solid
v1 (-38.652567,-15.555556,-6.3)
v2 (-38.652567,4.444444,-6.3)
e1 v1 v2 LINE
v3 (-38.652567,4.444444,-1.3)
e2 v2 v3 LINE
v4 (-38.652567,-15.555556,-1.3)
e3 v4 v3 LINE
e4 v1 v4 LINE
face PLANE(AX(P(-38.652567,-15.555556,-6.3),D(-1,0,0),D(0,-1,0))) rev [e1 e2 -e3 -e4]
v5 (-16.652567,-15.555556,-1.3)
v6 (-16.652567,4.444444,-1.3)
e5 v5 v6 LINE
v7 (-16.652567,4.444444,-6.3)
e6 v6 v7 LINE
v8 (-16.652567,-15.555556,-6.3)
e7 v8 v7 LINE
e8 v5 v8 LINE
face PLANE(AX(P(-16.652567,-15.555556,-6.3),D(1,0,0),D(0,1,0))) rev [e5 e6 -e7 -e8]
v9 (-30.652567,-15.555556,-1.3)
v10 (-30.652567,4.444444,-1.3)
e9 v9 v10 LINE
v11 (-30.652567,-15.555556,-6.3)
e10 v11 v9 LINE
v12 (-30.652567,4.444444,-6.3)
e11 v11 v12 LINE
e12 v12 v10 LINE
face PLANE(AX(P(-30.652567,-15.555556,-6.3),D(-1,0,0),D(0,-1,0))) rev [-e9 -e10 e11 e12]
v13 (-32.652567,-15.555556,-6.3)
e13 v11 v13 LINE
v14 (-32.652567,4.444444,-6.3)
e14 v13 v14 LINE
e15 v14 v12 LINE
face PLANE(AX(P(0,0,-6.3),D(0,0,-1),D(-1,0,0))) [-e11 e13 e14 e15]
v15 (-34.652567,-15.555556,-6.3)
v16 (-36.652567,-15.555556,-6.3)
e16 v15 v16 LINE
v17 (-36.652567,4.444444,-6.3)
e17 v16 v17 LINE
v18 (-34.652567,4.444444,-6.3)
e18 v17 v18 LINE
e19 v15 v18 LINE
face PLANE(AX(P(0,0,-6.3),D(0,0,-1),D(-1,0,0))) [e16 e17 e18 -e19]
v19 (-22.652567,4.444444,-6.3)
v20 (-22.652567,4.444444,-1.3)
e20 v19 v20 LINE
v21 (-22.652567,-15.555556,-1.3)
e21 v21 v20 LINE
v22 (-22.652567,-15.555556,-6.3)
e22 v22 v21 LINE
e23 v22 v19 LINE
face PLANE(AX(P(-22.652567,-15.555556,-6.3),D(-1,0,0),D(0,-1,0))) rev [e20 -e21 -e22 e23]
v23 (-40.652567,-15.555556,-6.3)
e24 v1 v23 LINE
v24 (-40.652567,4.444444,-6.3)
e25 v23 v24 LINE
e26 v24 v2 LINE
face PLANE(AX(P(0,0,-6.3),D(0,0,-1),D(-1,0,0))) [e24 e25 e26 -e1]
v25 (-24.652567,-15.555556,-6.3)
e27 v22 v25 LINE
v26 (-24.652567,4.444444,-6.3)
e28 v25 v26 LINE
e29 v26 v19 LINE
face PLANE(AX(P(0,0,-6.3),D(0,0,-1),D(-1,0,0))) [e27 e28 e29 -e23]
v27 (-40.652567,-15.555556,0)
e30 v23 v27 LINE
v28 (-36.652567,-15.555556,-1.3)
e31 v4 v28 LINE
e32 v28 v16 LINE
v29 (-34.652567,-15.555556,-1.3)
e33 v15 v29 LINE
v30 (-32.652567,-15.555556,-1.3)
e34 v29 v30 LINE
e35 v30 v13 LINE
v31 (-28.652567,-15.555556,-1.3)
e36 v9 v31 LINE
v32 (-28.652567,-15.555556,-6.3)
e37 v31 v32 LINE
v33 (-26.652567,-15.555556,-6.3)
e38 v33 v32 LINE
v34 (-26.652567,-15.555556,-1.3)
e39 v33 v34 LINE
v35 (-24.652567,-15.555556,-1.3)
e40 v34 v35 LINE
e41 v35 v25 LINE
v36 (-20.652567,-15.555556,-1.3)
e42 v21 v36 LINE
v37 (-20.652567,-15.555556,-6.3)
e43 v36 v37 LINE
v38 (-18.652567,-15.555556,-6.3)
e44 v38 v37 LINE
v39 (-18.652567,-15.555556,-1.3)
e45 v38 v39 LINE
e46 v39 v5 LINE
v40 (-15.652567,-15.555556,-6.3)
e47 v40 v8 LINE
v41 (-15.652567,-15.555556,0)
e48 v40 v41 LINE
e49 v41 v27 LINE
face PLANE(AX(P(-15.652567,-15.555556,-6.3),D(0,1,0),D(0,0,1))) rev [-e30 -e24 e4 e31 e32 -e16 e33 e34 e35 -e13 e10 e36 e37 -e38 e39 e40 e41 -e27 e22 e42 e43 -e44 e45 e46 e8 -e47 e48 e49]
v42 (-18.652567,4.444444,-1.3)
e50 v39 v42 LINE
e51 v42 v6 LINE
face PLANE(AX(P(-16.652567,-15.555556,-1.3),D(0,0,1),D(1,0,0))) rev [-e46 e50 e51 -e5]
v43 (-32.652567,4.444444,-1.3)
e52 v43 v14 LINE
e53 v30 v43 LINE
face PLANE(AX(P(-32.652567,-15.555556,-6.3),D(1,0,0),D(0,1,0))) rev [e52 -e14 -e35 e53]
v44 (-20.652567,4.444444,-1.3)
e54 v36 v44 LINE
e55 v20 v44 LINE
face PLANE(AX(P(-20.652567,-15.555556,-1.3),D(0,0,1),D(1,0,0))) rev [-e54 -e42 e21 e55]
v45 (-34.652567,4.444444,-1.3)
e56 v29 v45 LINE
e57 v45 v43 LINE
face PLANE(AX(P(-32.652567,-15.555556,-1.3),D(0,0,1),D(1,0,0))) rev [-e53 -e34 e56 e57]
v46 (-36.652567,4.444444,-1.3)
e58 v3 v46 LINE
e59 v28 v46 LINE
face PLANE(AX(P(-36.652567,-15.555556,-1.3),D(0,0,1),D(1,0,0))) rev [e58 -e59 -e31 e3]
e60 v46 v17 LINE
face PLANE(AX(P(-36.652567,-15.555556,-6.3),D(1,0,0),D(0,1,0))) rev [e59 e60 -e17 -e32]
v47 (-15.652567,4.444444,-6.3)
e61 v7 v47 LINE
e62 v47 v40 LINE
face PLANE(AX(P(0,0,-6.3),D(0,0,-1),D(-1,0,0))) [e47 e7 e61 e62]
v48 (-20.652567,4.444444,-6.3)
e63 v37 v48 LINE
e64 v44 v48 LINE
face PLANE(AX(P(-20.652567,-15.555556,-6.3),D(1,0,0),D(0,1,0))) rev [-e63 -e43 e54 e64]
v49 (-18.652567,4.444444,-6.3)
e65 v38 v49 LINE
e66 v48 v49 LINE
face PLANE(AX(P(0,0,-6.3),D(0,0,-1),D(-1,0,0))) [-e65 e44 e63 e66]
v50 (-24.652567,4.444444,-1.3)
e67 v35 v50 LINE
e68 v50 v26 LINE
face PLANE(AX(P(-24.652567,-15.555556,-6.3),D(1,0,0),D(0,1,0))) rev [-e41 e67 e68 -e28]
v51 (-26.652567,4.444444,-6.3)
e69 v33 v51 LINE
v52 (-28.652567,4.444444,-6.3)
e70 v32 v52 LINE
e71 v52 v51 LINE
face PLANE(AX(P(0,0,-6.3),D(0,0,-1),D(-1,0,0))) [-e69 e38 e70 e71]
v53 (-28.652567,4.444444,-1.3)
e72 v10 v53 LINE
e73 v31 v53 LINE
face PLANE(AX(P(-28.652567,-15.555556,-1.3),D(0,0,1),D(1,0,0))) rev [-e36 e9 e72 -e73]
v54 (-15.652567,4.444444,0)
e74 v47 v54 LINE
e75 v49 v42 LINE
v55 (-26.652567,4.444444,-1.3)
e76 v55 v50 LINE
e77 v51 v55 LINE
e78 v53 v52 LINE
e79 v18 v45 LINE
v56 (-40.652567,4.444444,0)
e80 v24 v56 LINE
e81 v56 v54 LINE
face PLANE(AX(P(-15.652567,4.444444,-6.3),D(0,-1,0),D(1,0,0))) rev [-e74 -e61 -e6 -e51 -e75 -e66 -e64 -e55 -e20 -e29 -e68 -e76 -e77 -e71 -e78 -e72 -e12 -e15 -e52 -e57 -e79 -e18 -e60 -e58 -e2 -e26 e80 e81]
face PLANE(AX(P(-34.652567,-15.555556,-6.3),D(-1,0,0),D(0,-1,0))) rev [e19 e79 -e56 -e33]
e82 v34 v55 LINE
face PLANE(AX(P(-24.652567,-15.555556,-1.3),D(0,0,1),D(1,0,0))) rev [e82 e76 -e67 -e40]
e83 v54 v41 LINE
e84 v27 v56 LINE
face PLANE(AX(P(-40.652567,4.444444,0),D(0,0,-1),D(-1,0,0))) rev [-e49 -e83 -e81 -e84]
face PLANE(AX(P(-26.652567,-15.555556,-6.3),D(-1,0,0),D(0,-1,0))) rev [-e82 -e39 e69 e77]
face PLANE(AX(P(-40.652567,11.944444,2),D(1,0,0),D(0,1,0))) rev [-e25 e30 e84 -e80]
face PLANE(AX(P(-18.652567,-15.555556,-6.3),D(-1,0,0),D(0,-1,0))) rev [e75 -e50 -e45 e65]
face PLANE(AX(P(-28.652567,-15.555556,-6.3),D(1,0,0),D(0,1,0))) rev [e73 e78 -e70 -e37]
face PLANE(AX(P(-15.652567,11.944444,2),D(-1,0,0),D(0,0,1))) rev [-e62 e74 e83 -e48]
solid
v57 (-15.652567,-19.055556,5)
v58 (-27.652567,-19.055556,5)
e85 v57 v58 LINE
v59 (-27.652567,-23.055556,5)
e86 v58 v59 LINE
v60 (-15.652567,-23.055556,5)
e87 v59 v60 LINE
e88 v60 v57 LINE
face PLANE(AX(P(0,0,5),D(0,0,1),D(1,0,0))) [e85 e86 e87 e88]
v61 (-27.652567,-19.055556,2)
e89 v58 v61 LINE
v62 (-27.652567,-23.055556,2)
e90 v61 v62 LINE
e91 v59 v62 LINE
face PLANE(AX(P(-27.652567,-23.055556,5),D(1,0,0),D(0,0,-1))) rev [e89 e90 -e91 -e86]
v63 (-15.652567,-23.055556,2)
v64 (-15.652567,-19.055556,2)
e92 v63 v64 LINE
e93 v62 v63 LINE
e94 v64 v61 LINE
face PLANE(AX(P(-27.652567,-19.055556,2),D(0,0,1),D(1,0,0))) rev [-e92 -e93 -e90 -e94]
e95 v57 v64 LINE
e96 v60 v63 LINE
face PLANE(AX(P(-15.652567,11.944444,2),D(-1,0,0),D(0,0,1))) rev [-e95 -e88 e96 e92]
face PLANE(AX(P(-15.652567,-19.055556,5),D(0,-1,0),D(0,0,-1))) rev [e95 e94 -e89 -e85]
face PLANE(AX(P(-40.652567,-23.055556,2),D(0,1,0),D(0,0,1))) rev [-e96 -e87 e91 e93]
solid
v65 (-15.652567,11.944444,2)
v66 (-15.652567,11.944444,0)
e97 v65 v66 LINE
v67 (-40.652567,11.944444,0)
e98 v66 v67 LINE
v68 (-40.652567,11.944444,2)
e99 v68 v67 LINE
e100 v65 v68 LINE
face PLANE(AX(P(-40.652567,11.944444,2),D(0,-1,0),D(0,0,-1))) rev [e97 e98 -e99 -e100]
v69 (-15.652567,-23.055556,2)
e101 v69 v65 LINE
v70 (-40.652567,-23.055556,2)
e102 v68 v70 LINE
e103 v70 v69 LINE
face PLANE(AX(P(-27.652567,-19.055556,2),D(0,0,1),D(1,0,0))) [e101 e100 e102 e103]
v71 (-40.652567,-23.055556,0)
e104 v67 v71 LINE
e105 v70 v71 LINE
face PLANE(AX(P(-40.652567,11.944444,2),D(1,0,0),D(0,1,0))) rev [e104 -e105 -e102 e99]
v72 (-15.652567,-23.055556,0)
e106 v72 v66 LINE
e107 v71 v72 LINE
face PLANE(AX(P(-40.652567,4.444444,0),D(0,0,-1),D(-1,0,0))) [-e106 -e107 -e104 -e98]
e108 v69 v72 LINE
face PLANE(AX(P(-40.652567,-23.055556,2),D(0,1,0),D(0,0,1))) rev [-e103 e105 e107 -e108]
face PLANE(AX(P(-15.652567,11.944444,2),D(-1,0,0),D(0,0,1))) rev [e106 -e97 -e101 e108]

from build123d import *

# Parameters (mm, degrees)
CROQUIS1_W              = 25
CROQUIS1_H              = 35
SALIENTE_EXTRUIR1_DEPTH = 2
CROQUIS2_W              = 12
CROQUIS2_H              = 4
SALIENTE_EXTRUIR2_DEPTH = 3
CROQUIS4_W              = 25
CROQUIS4_H              = 20
SALIENTE_EXTRUIR3_DEPTH = 6.3
CROQUIS5_W              = 2
CROQUIS5_H              = 5
CORTAR_EXTRUIR1_DEPTH   = 20


# Read off the part's stored shape, not the designer's step: Partir1, Partir2
with BuildPart() as part:
    # Croquis1 → Saliente-Extruir1 (new body)
    with BuildSketch(Plane.XY):
        with Locations((-28.152566884, -5.555555556)):
            Rectangle(CROQUIS1_W, CROQUIS1_H)
    extrude(amount=SALIENTE_EXTRUIR1_DEPTH)

    # Croquis2 → Saliente-Extruir2 (add)
    with BuildSketch(Plane.XY.offset(2)):
        with Locations((-21.652566884, -21.055555556)):
            Rectangle(CROQUIS2_W, CROQUIS2_H)
    extrude(amount=SALIENTE_EXTRUIR2_DEPTH)

    # Croquis4 → Saliente-Extruir3 (add)
    with BuildSketch(Plane(origin=(0, 0, 0), x_dir=(-1, 0, 0), z_dir=(0, 0, -1))):
        with Locations((28.152566884, -5.555555556)):
            Rectangle(CROQUIS4_W, CROQUIS4_H)
    extrude(amount=SALIENTE_EXTRUIR3_DEPTH)

    # Croquis5 → Cortar-Extruir1 (cut)
    with BuildSketch(Plane(origin=(0, 4.444444444, 0), x_dir=(1, 0, 0), z_dir=(0, 1, 0))):
        with Locations((-17.652566884, 3.8)):
            Rectangle(CROQUIS5_W, CROQUIS5_H)
        with Locations((-21.652566884, 3.8)):
            Rectangle(CROQUIS5_W, CROQUIS5_H)
        with Locations((-25.652566884, 3.8)):
            Rectangle(CROQUIS5_W, CROQUIS5_H)
        with Locations((-29.652566884, 3.8)):
            Rectangle(CROQUIS5_W, CROQUIS5_H)
        with Locations((-33.652566884, 3.8)):
            Rectangle(CROQUIS5_W, CROQUIS5_H)
        with Locations((-37.652566884, 3.8)):
            Rectangle(CROQUIS5_W, CROQUIS5_H)
    extrude(amount=-CORTAR_EXTRUIR1_DEPTH, mode=Mode.SUBTRACT)


with BuildPart() as body_2:
    # Partir1: the piece on the far side of the plane
    add(part.part)
    split(bisect_by=Plane.XY.offset(2), keep=Keep.BOTTOM)


with BuildPart() as part_1:
    add(part.part)

    # Partir1
    split(bisect_by=Plane.XY.offset(2), keep=Keep.TOP)


with BuildPart() as body_3:
    # Partir2: the piece on the far side of the plane
    add(body_2.part)
    split(bisect_by=Plane.XY, keep=Keep.BOTTOM)


with BuildPart() as body_2_1:
    add(body_2.part)

    # Partir2
    split(bisect_by=Plane.XY, keep=Keep.TOP)


solid = Compound([part_1.part, body_3.part, body_2_1.part])
